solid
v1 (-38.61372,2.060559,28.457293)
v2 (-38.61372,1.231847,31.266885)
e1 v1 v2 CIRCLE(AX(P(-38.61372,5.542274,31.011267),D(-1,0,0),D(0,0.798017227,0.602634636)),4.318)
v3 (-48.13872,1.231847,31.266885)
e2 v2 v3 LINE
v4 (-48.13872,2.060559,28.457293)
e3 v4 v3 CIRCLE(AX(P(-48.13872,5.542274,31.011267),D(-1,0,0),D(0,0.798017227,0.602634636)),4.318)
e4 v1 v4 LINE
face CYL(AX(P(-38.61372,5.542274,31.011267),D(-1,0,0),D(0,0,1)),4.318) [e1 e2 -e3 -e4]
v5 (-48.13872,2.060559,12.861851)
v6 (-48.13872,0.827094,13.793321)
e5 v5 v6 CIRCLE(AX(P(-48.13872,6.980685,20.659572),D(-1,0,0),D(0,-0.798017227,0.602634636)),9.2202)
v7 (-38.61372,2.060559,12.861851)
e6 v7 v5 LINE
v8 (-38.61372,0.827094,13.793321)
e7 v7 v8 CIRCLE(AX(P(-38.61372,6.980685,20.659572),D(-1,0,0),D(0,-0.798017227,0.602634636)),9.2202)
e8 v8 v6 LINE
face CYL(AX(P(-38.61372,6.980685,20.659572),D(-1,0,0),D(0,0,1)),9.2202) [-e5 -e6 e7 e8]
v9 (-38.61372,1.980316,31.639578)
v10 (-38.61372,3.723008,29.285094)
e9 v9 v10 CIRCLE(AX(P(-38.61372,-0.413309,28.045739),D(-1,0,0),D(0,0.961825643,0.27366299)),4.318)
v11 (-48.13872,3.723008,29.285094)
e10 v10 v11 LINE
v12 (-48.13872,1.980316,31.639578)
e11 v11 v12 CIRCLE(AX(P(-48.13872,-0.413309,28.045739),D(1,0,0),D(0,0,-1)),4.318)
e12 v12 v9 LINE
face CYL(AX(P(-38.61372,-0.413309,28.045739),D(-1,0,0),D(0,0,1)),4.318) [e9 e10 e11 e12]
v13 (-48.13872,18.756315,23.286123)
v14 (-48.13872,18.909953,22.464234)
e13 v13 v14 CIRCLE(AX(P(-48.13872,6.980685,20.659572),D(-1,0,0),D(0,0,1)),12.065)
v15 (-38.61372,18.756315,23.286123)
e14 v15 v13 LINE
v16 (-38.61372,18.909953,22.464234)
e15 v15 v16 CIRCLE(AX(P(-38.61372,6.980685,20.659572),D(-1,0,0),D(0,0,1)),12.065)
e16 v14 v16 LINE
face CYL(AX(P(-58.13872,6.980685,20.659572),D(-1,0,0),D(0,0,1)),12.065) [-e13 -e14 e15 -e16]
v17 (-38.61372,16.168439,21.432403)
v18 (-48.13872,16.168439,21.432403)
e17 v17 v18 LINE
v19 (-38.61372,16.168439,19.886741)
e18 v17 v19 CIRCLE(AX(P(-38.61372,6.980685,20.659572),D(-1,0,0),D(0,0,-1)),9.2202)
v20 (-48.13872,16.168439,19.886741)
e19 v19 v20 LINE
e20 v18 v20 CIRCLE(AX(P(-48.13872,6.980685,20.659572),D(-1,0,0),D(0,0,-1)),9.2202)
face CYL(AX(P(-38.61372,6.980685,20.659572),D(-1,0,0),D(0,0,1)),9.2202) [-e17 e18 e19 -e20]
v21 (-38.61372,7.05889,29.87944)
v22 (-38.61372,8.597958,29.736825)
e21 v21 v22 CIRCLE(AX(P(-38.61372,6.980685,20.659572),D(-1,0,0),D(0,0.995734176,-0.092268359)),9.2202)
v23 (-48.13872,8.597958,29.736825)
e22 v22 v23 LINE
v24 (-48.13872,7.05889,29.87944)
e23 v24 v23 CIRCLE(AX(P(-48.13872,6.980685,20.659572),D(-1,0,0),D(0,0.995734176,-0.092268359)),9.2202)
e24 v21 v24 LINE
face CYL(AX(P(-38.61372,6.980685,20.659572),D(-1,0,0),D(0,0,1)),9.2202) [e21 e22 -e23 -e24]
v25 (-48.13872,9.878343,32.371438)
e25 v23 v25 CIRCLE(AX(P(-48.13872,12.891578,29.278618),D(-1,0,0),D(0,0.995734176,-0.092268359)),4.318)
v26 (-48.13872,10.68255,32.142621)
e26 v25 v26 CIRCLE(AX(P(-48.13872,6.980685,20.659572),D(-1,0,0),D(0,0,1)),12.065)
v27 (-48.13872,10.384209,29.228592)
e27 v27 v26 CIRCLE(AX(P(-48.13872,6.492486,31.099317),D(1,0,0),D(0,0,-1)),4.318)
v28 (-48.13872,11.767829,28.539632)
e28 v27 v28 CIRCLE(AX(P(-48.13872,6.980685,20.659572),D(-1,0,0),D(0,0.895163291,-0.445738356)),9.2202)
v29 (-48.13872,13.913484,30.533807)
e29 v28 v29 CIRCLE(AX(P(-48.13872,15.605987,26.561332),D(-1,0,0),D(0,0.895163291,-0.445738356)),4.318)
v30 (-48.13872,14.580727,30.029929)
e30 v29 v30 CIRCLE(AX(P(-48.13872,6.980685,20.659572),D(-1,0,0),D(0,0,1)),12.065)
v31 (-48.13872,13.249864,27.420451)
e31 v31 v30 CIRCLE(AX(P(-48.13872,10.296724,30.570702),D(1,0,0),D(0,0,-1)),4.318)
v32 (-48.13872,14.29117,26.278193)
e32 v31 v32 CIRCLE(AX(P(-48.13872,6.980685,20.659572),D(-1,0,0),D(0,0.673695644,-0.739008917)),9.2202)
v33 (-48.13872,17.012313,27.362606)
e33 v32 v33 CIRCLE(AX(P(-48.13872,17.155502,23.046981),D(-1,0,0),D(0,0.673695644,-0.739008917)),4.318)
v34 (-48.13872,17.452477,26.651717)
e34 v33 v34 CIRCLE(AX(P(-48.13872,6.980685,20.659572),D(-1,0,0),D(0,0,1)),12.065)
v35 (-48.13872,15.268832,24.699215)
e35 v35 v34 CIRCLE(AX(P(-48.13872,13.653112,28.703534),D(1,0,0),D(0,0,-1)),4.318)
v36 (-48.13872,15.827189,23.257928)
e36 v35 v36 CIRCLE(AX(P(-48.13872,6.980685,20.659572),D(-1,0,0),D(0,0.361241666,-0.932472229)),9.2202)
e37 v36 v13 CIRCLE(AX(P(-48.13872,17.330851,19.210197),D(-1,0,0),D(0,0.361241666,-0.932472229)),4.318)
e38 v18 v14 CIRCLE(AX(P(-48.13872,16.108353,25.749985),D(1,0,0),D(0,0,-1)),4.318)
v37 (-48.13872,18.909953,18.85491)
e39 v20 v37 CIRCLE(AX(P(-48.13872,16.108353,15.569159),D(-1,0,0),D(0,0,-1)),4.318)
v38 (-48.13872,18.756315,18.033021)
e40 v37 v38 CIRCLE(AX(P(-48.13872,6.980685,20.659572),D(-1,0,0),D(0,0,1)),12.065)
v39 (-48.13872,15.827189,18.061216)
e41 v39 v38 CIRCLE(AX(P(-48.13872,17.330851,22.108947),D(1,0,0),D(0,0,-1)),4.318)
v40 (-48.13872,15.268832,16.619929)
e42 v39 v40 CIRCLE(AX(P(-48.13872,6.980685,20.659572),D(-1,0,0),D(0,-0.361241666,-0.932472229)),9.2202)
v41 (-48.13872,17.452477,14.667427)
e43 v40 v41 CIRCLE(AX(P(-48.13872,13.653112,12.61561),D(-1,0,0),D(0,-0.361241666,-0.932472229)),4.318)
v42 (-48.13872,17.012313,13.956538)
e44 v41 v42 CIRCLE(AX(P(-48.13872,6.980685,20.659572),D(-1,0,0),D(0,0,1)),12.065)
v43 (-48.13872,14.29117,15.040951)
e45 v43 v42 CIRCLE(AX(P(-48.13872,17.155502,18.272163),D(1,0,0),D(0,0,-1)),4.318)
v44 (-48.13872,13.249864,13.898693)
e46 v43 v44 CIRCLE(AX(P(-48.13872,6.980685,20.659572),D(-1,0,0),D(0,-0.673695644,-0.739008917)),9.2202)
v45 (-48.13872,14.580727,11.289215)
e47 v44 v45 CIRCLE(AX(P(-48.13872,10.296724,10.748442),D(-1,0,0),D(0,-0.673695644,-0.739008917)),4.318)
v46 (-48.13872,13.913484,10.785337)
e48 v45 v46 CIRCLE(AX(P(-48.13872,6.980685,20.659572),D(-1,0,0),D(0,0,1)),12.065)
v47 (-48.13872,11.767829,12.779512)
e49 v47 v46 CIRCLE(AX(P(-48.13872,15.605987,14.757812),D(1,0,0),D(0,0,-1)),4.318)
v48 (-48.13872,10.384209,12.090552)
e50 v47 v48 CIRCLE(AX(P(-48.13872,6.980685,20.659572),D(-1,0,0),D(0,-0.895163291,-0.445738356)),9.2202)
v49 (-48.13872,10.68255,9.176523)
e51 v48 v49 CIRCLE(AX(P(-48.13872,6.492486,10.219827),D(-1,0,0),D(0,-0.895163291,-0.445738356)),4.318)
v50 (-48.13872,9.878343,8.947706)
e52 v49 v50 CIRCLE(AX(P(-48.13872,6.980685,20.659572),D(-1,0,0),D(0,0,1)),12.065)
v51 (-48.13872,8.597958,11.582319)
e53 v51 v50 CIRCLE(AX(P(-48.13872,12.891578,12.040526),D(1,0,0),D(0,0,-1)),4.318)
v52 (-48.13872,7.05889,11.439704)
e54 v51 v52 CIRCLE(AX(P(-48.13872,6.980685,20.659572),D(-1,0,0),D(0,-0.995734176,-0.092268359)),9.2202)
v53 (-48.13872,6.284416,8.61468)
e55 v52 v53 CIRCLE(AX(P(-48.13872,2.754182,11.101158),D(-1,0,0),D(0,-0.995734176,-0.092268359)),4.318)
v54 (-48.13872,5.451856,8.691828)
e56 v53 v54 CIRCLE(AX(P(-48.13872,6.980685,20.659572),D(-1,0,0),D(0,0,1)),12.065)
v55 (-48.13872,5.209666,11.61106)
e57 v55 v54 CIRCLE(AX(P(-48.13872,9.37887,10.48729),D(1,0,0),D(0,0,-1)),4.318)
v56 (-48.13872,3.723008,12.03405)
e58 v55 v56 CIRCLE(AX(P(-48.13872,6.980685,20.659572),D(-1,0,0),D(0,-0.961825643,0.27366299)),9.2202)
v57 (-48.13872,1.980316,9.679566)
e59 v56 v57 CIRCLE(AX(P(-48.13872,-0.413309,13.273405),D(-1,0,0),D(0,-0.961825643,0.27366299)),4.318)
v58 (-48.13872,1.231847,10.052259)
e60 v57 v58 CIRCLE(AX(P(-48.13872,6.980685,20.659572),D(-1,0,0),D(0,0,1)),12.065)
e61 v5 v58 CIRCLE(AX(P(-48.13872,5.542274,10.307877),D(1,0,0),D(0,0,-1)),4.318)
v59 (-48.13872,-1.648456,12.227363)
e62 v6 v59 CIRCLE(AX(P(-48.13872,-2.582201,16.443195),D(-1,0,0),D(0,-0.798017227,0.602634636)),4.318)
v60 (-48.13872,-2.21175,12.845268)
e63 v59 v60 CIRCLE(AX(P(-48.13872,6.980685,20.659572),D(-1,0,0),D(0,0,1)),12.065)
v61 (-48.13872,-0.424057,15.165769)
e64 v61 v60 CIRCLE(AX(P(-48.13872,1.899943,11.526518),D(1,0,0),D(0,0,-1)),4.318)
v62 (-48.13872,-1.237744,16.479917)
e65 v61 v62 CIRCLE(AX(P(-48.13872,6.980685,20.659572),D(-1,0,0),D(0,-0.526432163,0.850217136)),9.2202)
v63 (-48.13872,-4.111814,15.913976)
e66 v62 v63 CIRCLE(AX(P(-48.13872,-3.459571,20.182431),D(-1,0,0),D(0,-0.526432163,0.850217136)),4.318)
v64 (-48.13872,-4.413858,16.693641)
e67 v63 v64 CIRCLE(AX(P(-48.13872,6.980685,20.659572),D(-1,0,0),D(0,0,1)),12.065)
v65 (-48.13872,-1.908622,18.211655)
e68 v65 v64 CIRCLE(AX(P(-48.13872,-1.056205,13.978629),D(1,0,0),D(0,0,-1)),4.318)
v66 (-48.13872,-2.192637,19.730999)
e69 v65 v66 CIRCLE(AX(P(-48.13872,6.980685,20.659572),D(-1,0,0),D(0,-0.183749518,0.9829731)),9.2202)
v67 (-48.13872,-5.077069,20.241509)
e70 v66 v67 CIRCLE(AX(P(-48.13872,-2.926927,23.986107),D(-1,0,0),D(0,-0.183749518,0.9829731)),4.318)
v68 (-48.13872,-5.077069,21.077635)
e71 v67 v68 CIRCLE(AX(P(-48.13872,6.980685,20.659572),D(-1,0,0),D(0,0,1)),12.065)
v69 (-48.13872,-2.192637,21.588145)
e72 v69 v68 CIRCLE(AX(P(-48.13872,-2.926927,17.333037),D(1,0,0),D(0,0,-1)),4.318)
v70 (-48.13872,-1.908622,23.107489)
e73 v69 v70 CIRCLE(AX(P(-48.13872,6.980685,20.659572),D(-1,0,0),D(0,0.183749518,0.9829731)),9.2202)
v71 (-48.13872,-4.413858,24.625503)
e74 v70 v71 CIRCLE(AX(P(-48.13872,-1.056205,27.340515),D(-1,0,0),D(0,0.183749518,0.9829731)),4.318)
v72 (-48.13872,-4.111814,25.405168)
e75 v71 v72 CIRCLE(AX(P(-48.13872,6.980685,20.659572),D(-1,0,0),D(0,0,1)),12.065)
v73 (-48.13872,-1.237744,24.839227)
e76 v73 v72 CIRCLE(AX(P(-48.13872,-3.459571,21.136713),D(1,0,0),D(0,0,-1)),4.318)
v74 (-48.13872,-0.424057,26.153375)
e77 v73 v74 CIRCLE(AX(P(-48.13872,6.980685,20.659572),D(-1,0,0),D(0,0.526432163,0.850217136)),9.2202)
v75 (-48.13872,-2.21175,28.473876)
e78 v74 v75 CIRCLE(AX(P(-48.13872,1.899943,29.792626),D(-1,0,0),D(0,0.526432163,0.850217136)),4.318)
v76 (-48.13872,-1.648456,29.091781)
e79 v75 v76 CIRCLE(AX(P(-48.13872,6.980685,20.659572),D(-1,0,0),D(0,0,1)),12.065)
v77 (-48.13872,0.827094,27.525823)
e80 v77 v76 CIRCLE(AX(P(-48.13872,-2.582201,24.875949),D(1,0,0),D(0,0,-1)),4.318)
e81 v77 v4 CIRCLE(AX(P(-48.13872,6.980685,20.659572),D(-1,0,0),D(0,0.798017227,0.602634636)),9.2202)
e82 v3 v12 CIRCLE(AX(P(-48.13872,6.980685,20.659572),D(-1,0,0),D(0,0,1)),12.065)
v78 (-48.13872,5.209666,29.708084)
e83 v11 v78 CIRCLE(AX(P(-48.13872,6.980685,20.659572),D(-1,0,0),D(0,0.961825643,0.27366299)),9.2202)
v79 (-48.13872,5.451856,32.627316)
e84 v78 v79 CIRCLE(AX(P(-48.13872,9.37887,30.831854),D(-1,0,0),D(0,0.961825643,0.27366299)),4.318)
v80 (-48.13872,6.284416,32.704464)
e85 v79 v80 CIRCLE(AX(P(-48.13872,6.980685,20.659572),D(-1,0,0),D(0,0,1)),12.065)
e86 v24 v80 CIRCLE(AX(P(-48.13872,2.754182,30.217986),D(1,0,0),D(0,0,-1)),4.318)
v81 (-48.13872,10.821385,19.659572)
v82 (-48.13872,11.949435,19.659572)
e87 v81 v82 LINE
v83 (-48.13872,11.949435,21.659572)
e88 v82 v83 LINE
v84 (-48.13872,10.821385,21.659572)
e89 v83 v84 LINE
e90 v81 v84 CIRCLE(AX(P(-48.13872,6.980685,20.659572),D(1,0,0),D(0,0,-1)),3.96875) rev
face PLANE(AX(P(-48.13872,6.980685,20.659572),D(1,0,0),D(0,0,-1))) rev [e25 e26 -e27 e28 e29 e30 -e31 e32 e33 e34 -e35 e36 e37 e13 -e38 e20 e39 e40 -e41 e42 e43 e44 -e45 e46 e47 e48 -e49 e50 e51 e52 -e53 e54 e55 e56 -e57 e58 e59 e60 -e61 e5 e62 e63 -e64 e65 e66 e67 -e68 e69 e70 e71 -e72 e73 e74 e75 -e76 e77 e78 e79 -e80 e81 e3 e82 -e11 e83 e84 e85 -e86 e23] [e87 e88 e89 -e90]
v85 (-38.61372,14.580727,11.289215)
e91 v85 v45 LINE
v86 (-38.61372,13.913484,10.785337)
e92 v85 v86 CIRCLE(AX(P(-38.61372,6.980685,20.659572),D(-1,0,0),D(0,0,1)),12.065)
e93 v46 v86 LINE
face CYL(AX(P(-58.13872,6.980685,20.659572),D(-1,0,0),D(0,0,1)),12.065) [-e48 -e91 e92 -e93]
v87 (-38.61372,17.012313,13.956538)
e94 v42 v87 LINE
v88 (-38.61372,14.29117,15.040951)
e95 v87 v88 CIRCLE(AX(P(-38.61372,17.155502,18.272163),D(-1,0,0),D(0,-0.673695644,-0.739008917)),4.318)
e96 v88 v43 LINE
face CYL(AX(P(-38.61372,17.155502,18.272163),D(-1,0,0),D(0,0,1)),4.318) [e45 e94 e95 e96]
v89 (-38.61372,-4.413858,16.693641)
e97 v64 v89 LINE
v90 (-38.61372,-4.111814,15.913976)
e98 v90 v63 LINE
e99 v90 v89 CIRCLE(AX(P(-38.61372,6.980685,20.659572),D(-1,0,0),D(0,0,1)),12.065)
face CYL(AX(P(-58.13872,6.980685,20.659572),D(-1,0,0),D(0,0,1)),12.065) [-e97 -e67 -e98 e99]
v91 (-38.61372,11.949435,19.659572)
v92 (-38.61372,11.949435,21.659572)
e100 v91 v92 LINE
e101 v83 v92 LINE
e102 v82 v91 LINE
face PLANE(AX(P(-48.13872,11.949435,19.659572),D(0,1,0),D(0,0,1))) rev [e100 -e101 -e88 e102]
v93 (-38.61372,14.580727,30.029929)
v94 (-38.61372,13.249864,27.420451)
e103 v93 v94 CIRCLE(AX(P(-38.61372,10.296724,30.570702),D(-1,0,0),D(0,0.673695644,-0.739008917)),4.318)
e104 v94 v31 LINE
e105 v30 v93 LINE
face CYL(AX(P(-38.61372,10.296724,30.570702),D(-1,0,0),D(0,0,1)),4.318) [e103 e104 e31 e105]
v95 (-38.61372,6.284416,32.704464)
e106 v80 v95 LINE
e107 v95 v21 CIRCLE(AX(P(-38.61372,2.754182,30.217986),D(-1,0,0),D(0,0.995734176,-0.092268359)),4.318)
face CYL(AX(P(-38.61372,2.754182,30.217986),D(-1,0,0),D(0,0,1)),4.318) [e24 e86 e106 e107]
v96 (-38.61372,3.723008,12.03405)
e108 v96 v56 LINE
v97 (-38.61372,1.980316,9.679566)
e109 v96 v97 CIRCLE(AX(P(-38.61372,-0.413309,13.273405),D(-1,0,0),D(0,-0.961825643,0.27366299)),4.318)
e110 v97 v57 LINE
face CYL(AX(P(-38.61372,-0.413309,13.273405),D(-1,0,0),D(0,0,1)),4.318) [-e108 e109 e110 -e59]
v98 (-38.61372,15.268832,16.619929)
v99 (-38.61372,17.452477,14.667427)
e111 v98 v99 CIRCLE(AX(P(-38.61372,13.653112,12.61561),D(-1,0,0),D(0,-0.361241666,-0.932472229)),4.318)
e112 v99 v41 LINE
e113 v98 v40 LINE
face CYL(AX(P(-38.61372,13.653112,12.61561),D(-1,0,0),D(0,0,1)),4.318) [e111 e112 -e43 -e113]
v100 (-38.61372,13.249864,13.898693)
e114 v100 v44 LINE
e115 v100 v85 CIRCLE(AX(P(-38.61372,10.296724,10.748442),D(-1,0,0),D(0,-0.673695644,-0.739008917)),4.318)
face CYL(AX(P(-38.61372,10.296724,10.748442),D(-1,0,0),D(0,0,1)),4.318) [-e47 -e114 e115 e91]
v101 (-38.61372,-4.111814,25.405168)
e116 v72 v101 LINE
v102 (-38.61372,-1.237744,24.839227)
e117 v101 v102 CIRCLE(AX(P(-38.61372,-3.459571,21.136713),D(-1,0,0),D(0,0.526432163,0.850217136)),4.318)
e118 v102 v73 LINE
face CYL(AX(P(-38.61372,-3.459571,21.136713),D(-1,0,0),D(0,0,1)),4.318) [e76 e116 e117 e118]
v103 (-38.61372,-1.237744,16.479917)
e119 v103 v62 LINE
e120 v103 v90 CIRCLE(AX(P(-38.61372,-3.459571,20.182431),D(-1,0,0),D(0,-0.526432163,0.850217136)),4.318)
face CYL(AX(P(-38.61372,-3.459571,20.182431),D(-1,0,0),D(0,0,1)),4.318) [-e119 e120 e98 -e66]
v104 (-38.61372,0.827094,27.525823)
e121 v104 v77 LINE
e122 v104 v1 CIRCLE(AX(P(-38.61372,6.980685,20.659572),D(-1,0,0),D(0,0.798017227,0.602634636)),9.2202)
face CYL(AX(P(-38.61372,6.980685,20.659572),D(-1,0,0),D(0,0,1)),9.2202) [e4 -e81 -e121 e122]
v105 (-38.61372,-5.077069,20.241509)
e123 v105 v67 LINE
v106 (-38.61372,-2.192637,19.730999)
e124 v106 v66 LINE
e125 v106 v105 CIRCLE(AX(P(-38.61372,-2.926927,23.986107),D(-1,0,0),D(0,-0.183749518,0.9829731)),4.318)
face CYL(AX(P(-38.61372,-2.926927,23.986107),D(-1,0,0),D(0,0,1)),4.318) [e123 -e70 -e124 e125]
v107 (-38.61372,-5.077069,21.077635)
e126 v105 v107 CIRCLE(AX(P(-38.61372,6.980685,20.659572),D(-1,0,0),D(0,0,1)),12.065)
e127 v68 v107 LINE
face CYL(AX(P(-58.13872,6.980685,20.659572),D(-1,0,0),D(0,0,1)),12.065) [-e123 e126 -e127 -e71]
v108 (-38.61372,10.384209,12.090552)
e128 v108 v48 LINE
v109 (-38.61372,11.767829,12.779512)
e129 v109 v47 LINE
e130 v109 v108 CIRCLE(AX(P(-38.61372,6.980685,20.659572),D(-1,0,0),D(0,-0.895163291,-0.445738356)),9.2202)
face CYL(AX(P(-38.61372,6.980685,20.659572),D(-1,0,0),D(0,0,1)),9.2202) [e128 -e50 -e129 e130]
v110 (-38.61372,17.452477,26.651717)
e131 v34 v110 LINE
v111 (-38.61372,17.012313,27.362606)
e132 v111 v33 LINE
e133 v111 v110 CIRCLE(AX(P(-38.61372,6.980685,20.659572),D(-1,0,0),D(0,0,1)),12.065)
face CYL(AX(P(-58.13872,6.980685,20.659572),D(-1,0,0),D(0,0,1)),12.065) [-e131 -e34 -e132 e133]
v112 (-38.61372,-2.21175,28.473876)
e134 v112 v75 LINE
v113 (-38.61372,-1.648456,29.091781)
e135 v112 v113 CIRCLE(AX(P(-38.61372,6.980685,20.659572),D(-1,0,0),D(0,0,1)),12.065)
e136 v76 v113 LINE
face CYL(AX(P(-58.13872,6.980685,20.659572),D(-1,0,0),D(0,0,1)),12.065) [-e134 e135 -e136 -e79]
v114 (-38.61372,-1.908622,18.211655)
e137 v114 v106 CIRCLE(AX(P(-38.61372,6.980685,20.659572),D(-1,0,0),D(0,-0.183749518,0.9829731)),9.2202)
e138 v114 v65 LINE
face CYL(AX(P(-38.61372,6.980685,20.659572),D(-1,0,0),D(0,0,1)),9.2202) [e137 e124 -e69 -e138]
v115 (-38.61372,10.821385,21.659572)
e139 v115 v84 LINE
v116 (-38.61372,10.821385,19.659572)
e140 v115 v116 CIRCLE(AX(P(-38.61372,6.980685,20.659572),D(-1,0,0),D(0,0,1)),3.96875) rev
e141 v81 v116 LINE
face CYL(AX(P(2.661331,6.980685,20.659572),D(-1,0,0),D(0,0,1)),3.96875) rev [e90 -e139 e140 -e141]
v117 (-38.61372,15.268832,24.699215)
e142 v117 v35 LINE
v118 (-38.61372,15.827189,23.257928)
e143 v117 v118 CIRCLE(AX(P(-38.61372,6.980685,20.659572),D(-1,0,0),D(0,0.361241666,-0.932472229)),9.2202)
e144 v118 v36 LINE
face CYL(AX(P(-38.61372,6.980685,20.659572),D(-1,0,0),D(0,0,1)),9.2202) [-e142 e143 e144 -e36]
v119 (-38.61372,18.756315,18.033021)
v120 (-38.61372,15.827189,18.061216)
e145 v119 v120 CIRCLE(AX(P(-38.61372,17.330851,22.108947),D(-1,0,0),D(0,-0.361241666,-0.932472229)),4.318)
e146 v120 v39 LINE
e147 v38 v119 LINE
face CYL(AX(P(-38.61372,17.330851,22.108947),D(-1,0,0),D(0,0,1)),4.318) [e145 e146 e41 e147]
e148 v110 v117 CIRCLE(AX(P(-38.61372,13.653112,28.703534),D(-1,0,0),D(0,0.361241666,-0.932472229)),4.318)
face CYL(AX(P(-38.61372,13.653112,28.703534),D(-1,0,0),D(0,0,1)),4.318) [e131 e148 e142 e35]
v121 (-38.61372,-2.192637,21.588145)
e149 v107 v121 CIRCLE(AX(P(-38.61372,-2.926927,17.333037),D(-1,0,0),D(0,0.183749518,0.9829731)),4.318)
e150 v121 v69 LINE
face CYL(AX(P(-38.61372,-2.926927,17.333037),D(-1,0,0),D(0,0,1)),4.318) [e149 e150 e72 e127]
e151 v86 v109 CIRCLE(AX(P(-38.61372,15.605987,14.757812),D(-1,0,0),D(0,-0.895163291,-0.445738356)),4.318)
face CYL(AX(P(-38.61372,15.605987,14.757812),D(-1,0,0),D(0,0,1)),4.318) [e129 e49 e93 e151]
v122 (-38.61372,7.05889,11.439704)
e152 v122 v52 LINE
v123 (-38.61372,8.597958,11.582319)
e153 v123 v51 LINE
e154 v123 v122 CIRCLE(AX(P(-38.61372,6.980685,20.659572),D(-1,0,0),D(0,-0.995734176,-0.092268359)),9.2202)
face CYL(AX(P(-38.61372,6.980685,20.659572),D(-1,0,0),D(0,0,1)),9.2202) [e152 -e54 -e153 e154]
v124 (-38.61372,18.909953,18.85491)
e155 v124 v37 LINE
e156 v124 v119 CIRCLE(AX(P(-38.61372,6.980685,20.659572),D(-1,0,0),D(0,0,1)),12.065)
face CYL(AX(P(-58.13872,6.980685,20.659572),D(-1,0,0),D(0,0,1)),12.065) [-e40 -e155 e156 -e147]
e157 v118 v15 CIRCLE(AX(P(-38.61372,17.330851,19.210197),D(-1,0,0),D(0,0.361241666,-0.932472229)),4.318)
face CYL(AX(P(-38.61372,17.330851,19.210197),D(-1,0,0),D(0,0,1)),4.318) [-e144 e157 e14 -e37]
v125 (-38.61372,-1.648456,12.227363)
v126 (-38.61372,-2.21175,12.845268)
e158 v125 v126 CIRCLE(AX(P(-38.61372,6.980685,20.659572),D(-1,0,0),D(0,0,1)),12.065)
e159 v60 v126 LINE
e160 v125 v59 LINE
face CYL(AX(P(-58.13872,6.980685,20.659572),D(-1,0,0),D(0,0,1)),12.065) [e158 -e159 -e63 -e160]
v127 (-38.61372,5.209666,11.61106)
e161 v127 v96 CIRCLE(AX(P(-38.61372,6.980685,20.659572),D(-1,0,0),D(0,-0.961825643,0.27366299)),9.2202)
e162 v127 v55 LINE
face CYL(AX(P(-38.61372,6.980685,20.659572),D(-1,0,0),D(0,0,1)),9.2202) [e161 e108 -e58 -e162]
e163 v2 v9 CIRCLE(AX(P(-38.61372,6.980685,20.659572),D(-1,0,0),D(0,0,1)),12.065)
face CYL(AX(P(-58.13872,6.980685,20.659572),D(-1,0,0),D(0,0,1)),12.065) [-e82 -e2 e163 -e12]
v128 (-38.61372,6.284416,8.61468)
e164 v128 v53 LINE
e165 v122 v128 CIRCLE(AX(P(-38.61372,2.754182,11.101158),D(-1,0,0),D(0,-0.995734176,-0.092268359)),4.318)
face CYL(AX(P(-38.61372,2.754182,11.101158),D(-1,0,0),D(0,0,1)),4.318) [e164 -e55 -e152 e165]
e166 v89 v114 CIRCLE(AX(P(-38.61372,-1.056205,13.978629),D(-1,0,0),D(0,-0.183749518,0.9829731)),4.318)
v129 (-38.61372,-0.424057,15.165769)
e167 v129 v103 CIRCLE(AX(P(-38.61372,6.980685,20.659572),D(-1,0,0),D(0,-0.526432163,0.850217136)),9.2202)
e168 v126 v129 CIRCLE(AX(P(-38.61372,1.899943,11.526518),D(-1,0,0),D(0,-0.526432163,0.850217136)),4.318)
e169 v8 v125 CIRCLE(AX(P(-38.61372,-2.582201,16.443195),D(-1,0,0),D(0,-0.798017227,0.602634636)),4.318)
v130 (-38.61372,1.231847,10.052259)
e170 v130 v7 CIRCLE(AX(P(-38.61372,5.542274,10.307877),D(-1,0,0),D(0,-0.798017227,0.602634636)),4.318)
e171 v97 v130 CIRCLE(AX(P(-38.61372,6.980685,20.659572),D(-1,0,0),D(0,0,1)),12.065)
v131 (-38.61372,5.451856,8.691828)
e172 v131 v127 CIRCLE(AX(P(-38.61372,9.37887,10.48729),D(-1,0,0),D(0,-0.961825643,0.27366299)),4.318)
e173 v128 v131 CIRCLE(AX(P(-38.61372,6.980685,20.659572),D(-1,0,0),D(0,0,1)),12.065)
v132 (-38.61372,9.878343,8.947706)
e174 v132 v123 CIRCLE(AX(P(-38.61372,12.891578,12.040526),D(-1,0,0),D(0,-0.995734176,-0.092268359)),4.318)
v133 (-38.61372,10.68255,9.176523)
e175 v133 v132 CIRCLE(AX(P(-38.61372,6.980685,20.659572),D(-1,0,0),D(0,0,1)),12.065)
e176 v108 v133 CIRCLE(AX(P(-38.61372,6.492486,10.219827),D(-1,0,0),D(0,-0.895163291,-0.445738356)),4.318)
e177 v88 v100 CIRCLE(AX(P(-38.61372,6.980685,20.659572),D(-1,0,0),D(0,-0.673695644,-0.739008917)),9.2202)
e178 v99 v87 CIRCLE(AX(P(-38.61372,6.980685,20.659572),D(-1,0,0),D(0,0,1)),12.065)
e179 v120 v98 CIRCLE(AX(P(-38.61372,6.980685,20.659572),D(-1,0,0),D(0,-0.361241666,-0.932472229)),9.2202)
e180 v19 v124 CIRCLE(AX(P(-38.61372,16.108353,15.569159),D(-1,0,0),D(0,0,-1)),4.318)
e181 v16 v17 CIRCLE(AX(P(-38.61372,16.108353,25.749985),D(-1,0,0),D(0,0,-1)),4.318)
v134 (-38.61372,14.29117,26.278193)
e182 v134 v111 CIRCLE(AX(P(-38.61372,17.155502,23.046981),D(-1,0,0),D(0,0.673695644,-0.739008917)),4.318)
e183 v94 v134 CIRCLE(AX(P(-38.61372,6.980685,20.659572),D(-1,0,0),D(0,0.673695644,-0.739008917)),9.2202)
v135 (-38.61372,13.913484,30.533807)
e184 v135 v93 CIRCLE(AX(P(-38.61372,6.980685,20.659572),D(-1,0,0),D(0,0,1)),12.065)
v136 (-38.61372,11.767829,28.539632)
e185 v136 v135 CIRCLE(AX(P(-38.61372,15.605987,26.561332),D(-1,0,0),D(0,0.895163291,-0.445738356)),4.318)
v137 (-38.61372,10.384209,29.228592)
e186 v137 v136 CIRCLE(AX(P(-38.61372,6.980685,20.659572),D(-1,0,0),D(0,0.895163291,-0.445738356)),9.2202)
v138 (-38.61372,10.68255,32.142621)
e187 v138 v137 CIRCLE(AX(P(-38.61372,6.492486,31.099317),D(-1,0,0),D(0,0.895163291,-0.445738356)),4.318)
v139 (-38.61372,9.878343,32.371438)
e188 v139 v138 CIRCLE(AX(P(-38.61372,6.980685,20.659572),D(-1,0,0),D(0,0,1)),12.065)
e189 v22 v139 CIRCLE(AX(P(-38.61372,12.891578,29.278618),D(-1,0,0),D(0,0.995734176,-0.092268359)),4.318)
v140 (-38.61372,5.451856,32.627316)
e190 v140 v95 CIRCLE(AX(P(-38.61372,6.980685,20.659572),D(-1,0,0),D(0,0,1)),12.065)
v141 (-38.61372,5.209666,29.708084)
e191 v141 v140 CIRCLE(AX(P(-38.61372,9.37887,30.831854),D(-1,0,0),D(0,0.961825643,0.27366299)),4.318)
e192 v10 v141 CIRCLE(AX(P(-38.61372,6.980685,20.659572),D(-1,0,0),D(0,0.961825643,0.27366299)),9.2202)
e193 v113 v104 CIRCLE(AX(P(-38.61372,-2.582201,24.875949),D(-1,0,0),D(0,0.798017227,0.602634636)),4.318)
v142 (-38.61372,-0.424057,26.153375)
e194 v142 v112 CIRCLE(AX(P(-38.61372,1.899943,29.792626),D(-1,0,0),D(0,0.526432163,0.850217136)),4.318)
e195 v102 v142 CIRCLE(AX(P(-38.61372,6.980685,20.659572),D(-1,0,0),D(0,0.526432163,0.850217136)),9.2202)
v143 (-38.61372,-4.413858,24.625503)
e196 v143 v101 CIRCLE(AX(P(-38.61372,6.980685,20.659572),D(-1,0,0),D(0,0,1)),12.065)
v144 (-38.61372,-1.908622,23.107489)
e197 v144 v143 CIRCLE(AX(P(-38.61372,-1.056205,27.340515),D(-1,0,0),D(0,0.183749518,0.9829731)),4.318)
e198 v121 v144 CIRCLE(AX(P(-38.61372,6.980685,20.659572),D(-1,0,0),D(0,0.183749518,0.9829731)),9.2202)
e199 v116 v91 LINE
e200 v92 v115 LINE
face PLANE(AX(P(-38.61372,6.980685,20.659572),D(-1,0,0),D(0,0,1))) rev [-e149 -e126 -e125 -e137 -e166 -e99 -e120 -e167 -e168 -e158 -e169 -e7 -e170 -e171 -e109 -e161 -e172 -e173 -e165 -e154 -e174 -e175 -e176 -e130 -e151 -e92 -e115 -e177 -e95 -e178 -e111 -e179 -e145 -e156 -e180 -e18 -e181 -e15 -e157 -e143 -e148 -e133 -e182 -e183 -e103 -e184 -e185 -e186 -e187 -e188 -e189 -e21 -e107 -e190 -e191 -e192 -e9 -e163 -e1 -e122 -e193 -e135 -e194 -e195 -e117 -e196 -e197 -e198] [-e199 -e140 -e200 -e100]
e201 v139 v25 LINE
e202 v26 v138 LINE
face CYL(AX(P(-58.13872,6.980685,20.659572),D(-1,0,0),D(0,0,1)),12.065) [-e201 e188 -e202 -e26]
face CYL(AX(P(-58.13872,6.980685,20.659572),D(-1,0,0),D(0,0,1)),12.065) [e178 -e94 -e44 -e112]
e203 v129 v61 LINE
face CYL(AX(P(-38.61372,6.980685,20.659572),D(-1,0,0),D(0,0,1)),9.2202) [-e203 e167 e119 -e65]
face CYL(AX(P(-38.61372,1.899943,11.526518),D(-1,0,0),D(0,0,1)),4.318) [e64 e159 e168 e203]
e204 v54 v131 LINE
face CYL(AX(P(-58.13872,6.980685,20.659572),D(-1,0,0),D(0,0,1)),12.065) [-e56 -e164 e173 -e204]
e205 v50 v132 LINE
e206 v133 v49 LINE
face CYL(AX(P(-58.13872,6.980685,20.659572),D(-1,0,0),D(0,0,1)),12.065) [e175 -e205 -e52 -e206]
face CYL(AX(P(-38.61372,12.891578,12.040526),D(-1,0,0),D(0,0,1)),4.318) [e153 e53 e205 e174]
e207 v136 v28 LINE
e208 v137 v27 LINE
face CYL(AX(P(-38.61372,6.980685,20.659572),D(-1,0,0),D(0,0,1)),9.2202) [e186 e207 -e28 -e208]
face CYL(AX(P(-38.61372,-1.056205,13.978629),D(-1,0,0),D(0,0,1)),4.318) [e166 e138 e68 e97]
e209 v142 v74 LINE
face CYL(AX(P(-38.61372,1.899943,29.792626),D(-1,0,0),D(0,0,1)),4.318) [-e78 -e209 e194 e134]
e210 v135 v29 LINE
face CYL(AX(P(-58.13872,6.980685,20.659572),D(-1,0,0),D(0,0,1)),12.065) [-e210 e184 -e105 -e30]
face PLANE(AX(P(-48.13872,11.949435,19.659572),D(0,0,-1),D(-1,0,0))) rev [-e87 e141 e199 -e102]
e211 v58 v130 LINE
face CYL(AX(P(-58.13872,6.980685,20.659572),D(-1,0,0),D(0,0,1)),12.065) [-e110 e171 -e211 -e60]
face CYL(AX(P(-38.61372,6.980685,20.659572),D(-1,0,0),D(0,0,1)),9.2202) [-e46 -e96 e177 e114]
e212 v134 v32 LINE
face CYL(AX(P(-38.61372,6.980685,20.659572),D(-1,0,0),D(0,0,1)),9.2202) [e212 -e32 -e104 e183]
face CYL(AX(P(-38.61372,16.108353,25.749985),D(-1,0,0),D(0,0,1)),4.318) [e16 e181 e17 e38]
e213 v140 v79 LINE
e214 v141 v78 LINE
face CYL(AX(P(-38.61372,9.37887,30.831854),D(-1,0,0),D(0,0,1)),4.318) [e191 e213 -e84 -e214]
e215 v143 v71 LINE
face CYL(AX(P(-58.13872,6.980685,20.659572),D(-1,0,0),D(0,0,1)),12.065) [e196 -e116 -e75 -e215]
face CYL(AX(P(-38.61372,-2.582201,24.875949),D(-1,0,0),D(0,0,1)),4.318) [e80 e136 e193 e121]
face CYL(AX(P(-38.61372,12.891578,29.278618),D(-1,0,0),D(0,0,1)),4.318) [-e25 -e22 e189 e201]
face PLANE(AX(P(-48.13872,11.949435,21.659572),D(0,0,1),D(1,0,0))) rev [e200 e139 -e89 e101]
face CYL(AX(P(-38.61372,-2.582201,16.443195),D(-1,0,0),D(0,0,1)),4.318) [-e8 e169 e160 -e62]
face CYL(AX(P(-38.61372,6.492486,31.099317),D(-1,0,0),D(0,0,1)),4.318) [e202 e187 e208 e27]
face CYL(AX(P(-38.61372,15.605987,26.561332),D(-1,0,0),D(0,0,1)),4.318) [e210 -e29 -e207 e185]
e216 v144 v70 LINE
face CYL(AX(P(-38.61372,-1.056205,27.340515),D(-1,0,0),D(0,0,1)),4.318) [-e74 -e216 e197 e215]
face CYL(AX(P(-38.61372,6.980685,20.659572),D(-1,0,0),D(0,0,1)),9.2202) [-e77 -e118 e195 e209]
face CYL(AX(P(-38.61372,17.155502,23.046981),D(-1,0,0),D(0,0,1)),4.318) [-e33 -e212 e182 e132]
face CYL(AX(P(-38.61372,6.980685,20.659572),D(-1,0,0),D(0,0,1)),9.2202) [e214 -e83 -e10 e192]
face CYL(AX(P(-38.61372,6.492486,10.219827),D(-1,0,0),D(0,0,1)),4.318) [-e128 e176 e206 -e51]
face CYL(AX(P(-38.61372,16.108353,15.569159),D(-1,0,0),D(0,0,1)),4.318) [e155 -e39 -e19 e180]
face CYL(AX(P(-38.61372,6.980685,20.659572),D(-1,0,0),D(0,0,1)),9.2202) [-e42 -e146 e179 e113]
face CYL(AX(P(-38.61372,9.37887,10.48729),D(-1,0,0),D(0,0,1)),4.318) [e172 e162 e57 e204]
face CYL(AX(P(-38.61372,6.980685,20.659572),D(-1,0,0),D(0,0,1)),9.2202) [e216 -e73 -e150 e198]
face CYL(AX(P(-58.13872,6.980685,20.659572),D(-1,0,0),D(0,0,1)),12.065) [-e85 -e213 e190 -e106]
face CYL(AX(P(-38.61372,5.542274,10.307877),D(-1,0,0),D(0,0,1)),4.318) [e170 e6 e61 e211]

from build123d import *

# Parameters (mm, degrees)
SPUR_START             = -48.138720077
SPUR_GEAR_AI_OUTLINE_R = 3.96875
SPUR_GEAR_AI_DEPTH     = 9.525
SKETCH1_W              = 2
SKETCH1_H              = 2
CUT_EXTRUDE1_DEPTH     = 39.960158194


# Read off the part's stored shape, not the designer's step: spur gear_ai
with BuildPart() as part:
    # spur gear_ai outline → spur gear_ai (new body)
    with BuildSketch(Plane.YZ.offset(SPUR_START)):
        with BuildLine():
            ThreePointArc((17.012312953, 13.95653765), (17.238554936, 14.308167954), (17.452476746, 14.667426586))
            ThreePointArc((17.452476746, 14.667426586), (16.531280061, 15.83450279), (15.268831698, 16.619929001))
            ThreePointArc((15.268831698, 16.619929001), (15.578265643, 17.328851589), (15.827189257, 18.061216004))
            ThreePointArc((15.827189257, 18.061216004), (17.289288072, 17.791147015), (18.756314792, 18.033020543))
            ThreePointArc((18.756314792, 18.033020543), (18.840255641, 18.442634067), (18.909952602, 18.854910235))
            ThreePointArc((18.909952602, 18.854910235), (17.629365722, 19.61040176), (16.168439009, 19.886740939))
            ThreePointArc((16.168439009, 19.886740939), (16.200885193, 20.659571999), (16.168439009, 21.43240306))
            ThreePointArc((16.168439009, 21.43240306), (17.629365722, 21.708742239), (18.909952602, 22.464233764))
            ThreePointArc((18.909952602, 22.464233764), (18.840255641, 22.876509932), (18.756314792, 23.286123456))
            ThreePointArc((18.756314792, 23.286123456), (17.289288072, 23.527996984), (15.827189257, 23.257927995))
            ThreePointArc((15.827189257, 23.257927995), (15.578265643, 23.99029241), (15.268831698, 24.699214998))
            ThreePointArc((15.268831698, 24.699214998), (16.531280061, 25.484641209), (17.452476746, 26.651717413))
            ThreePointArc((17.452476746, 26.651717413), (17.238554936, 27.010976045), (17.012312953, 27.362606349))
            ThreePointArc((17.012312953, 27.362606349), (15.55697648, 27.05819552), (14.291170111, 26.278192676))
            ThreePointArc((14.291170111, 26.278192676), (13.794495212, 26.871180574), (13.249864274, 27.420450766))
            ThreePointArc((13.249864274, 27.420450766), (14.143333641, 28.608887845), (14.580727415, 30.029928621))
            ThreePointArc((14.580727415, 30.029928621), (14.251472081, 30.287649847), (13.913484198, 30.533807309))
            ThreePointArc((13.913484198, 30.533807309), (12.666389228, 29.724224493), (11.767829468, 28.5396315))
            ThreePointArc((11.767829468, 28.5396315), (11.090481981, 28.913156579), (10.384209477, 29.228592392))
            ThreePointArc((10.384209477, 29.228592392), (10.788031858, 30.659535328), (10.682550269, 32.142621244))
            ThreePointArc((10.682550269, 32.142621244), (10.282429168, 32.263998384), (9.878342522, 32.371438077))
            ThreePointArc((9.878342522, 32.371438077), (9.00791614, 31.166021918), (8.597958464, 29.736824624))
            ThreePointArc((8.597958464, 29.736824624), (7.831417921, 29.840440252), (7.058889866, 29.879440332))
            ThreePointArc((7.058889866, 29.879440332), (6.918526812, 31.359632351), (6.284415731, 32.704464437))
            ThreePointArc((6.284415731, 32.704464437), (5.867467436, 32.673104837), (5.451856166, 32.627316432))
            ThreePointArc((5.451856166, 32.627316432), (5.075654279, 31.188865063), (5.209665743, 29.708084482))
            ThreePointArc((5.209665743, 29.708084482), (4.457457692, 29.527796795), (3.72300828, 29.285093965))
            ThreePointArc((3.72300828, 29.285093965), (3.057416599, 30.614626934), (1.980316242, 31.639578163))
            ThreePointArc((1.980316242, 31.639578163), (1.60285193, 31.45971711), (1.231846643, 31.266884587))
            ThreePointArc((1.231846643, 31.266884587), (1.4006774, 29.789668835), (2.060559012, 28.45729259))
            ThreePointArc((2.060559012, 28.45729259), (1.424273318, 28.017450439), (0.827094013, 27.52582306))
            ThreePointArc((0.827094013, 27.52582306), (-0.273834451, 28.525136184), (-1.648455712, 29.091781215))
            ThreePointArc((-1.648455712, 29.091781215), (-1.935457393, 28.78770994), (-2.211750379, 28.473876399))
            ThreePointArc((-2.211750379, 28.473876399), (-1.520688507, 27.157402438), (-0.424057414, 26.153375324))
            ThreePointArc((-0.424057414, 26.153375324), (-0.858486842, 25.513381828), (-1.237743667, 24.839226903))
            ThreePointArc((-1.237743667, 24.839226903), (-2.625322424, 25.373357406), (-4.111814371, 25.405167687))
            ThreePointArc((-4.111814371, 25.405167687), (-4.269592255, 25.017952702), (-4.41385804, 24.625503102))
            ThreePointArc((-4.41385804, 24.625503102), (-3.293896789, 23.647568035), (-1.908622321, 23.107489476))
            ThreePointArc((-1.908622321, 23.107489476), (-2.082523381, 22.353779304), (-2.19263699, 21.58814519))
            ThreePointArc((-2.19263699, 21.58814519), (-3.67946584, 21.58495579), (-5.077069498, 21.077635166))
            ThreePointArc((-5.077069498, 21.077635166), (-5.084314807, 20.659572), (-5.077069498, 20.241508833))
            ThreePointArc((-5.077069498, 20.241508833), (-3.67946584, 19.734188209), (-2.19263699, 19.730998809))
            ThreePointArc((-2.19263699, 19.730998809), (-2.082523381, 18.965364695), (-1.908622321, 18.211654523))
            ThreePointArc((-1.908622321, 18.211654523), (-3.293896789, 17.671575965), (-4.41385804, 16.693640897))
            ThreePointArc((-4.41385804, 16.693640897), (-4.269592255, 16.301191297), (-4.111814371, 15.913976312))
            ThreePointArc((-4.111814371, 15.913976312), (-2.625322424, 15.945786593), (-1.237743667, 16.479917096))
            ThreePointArc((-1.237743667, 16.479917096), (-0.858486842, 15.805762171), (-0.424057414, 15.165768676))
            ThreePointArc((-0.424057414, 15.165768676), (-1.520688507, 14.161741561), (-2.211750379, 12.8452676))
            ThreePointArc((-2.211750379, 12.8452676), (-1.935457393, 12.531434059), (-1.648455712, 12.227362784))
            ThreePointArc((-1.648455712, 12.227362784), (-0.273834451, 12.794007815), (0.827094013, 13.793320939))
            ThreePointArc((0.827094013, 13.793320939), (1.424273319, 13.301693561), (2.060559012, 12.861851409))
            ThreePointArc((2.060559012, 12.861851409), (1.4006774, 11.529475164), (1.231846643, 10.052259412))
            ThreePointArc((1.231846643, 10.052259412), (1.60285193, 9.859426889), (1.980316242, 9.679565836))
            ThreePointArc((1.980316242, 9.679565836), (3.057416599, 10.704517066), (3.72300828, 12.034050035))
            ThreePointArc((3.72300828, 12.034050035), (4.457457692, 11.791347204), (5.209665743, 11.611059517))
            ThreePointArc((5.209665743, 11.611059517), (5.075654279, 10.130278936), (5.451856166, 8.691827567))
            ThreePointArc((5.451856166, 8.691827567), (5.867467436, 8.646039163), (6.284415731, 8.614679562))
            ThreePointArc((6.284415731, 8.614679562), (6.918526812, 9.959511648), (7.058889866, 11.439703667))
            ThreePointArc((7.058889866, 11.439703667), (7.831417921, 11.478703747), (8.597958464, 11.582319375))
            ThreePointArc((8.597958464, 11.582319375), (9.00791614, 10.153122081), (9.878342522, 8.947705923))
            ThreePointArc((9.878342522, 8.947705923), (10.282429168, 9.055145615), (10.682550269, 9.176522755))
            ThreePointArc((10.682550269, 9.176522755), (10.788031858, 10.659608671), (10.384209477, 12.090551607))
            ThreePointArc((10.384209477, 12.090551607), (11.090481981, 12.405987421), (11.767829468, 12.779512499))
            ThreePointArc((11.767829468, 12.779512499), (12.666389228, 11.594919506), (13.913484198, 10.78533669))
            ThreePointArc((13.913484198, 10.78533669), (14.251472081, 11.031494152), (14.580727415, 11.289215378))
            ThreePointArc((14.580727415, 11.289215378), (14.143333641, 12.710256154), (13.249864274, 13.898693234))
            ThreePointArc((13.249864274, 13.898693234), (13.794495212, 14.447963426), (14.291170111, 15.040951324))
            ThreePointArc((14.291170111, 15.040951324), (15.55697648, 14.260948479), (17.012312953, 13.95653765))
        make_face()
        with Locations((6.980685193, 20.659572)):
            Circle(SPUR_GEAR_AI_OUTLINE_R, mode=Mode.SUBTRACT)
    extrude(amount=SPUR_GEAR_AI_DEPTH)

    # Sketch1 → Cut-Extrude1 (cut, through all)
    with BuildSketch(Plane(origin=(-38.613720077, 0, 0), x_dir=(0, 0, -1), z_dir=(1, 0, 0))):
        with Locations((-20.659572, 10.949435193)):
            Rectangle(SKETCH1_W, SKETCH1_H)
    extrude(amount=-CUT_EXTRUDE1_DEPTH, mode=Mode.SUBTRACT)


solid = part.part
